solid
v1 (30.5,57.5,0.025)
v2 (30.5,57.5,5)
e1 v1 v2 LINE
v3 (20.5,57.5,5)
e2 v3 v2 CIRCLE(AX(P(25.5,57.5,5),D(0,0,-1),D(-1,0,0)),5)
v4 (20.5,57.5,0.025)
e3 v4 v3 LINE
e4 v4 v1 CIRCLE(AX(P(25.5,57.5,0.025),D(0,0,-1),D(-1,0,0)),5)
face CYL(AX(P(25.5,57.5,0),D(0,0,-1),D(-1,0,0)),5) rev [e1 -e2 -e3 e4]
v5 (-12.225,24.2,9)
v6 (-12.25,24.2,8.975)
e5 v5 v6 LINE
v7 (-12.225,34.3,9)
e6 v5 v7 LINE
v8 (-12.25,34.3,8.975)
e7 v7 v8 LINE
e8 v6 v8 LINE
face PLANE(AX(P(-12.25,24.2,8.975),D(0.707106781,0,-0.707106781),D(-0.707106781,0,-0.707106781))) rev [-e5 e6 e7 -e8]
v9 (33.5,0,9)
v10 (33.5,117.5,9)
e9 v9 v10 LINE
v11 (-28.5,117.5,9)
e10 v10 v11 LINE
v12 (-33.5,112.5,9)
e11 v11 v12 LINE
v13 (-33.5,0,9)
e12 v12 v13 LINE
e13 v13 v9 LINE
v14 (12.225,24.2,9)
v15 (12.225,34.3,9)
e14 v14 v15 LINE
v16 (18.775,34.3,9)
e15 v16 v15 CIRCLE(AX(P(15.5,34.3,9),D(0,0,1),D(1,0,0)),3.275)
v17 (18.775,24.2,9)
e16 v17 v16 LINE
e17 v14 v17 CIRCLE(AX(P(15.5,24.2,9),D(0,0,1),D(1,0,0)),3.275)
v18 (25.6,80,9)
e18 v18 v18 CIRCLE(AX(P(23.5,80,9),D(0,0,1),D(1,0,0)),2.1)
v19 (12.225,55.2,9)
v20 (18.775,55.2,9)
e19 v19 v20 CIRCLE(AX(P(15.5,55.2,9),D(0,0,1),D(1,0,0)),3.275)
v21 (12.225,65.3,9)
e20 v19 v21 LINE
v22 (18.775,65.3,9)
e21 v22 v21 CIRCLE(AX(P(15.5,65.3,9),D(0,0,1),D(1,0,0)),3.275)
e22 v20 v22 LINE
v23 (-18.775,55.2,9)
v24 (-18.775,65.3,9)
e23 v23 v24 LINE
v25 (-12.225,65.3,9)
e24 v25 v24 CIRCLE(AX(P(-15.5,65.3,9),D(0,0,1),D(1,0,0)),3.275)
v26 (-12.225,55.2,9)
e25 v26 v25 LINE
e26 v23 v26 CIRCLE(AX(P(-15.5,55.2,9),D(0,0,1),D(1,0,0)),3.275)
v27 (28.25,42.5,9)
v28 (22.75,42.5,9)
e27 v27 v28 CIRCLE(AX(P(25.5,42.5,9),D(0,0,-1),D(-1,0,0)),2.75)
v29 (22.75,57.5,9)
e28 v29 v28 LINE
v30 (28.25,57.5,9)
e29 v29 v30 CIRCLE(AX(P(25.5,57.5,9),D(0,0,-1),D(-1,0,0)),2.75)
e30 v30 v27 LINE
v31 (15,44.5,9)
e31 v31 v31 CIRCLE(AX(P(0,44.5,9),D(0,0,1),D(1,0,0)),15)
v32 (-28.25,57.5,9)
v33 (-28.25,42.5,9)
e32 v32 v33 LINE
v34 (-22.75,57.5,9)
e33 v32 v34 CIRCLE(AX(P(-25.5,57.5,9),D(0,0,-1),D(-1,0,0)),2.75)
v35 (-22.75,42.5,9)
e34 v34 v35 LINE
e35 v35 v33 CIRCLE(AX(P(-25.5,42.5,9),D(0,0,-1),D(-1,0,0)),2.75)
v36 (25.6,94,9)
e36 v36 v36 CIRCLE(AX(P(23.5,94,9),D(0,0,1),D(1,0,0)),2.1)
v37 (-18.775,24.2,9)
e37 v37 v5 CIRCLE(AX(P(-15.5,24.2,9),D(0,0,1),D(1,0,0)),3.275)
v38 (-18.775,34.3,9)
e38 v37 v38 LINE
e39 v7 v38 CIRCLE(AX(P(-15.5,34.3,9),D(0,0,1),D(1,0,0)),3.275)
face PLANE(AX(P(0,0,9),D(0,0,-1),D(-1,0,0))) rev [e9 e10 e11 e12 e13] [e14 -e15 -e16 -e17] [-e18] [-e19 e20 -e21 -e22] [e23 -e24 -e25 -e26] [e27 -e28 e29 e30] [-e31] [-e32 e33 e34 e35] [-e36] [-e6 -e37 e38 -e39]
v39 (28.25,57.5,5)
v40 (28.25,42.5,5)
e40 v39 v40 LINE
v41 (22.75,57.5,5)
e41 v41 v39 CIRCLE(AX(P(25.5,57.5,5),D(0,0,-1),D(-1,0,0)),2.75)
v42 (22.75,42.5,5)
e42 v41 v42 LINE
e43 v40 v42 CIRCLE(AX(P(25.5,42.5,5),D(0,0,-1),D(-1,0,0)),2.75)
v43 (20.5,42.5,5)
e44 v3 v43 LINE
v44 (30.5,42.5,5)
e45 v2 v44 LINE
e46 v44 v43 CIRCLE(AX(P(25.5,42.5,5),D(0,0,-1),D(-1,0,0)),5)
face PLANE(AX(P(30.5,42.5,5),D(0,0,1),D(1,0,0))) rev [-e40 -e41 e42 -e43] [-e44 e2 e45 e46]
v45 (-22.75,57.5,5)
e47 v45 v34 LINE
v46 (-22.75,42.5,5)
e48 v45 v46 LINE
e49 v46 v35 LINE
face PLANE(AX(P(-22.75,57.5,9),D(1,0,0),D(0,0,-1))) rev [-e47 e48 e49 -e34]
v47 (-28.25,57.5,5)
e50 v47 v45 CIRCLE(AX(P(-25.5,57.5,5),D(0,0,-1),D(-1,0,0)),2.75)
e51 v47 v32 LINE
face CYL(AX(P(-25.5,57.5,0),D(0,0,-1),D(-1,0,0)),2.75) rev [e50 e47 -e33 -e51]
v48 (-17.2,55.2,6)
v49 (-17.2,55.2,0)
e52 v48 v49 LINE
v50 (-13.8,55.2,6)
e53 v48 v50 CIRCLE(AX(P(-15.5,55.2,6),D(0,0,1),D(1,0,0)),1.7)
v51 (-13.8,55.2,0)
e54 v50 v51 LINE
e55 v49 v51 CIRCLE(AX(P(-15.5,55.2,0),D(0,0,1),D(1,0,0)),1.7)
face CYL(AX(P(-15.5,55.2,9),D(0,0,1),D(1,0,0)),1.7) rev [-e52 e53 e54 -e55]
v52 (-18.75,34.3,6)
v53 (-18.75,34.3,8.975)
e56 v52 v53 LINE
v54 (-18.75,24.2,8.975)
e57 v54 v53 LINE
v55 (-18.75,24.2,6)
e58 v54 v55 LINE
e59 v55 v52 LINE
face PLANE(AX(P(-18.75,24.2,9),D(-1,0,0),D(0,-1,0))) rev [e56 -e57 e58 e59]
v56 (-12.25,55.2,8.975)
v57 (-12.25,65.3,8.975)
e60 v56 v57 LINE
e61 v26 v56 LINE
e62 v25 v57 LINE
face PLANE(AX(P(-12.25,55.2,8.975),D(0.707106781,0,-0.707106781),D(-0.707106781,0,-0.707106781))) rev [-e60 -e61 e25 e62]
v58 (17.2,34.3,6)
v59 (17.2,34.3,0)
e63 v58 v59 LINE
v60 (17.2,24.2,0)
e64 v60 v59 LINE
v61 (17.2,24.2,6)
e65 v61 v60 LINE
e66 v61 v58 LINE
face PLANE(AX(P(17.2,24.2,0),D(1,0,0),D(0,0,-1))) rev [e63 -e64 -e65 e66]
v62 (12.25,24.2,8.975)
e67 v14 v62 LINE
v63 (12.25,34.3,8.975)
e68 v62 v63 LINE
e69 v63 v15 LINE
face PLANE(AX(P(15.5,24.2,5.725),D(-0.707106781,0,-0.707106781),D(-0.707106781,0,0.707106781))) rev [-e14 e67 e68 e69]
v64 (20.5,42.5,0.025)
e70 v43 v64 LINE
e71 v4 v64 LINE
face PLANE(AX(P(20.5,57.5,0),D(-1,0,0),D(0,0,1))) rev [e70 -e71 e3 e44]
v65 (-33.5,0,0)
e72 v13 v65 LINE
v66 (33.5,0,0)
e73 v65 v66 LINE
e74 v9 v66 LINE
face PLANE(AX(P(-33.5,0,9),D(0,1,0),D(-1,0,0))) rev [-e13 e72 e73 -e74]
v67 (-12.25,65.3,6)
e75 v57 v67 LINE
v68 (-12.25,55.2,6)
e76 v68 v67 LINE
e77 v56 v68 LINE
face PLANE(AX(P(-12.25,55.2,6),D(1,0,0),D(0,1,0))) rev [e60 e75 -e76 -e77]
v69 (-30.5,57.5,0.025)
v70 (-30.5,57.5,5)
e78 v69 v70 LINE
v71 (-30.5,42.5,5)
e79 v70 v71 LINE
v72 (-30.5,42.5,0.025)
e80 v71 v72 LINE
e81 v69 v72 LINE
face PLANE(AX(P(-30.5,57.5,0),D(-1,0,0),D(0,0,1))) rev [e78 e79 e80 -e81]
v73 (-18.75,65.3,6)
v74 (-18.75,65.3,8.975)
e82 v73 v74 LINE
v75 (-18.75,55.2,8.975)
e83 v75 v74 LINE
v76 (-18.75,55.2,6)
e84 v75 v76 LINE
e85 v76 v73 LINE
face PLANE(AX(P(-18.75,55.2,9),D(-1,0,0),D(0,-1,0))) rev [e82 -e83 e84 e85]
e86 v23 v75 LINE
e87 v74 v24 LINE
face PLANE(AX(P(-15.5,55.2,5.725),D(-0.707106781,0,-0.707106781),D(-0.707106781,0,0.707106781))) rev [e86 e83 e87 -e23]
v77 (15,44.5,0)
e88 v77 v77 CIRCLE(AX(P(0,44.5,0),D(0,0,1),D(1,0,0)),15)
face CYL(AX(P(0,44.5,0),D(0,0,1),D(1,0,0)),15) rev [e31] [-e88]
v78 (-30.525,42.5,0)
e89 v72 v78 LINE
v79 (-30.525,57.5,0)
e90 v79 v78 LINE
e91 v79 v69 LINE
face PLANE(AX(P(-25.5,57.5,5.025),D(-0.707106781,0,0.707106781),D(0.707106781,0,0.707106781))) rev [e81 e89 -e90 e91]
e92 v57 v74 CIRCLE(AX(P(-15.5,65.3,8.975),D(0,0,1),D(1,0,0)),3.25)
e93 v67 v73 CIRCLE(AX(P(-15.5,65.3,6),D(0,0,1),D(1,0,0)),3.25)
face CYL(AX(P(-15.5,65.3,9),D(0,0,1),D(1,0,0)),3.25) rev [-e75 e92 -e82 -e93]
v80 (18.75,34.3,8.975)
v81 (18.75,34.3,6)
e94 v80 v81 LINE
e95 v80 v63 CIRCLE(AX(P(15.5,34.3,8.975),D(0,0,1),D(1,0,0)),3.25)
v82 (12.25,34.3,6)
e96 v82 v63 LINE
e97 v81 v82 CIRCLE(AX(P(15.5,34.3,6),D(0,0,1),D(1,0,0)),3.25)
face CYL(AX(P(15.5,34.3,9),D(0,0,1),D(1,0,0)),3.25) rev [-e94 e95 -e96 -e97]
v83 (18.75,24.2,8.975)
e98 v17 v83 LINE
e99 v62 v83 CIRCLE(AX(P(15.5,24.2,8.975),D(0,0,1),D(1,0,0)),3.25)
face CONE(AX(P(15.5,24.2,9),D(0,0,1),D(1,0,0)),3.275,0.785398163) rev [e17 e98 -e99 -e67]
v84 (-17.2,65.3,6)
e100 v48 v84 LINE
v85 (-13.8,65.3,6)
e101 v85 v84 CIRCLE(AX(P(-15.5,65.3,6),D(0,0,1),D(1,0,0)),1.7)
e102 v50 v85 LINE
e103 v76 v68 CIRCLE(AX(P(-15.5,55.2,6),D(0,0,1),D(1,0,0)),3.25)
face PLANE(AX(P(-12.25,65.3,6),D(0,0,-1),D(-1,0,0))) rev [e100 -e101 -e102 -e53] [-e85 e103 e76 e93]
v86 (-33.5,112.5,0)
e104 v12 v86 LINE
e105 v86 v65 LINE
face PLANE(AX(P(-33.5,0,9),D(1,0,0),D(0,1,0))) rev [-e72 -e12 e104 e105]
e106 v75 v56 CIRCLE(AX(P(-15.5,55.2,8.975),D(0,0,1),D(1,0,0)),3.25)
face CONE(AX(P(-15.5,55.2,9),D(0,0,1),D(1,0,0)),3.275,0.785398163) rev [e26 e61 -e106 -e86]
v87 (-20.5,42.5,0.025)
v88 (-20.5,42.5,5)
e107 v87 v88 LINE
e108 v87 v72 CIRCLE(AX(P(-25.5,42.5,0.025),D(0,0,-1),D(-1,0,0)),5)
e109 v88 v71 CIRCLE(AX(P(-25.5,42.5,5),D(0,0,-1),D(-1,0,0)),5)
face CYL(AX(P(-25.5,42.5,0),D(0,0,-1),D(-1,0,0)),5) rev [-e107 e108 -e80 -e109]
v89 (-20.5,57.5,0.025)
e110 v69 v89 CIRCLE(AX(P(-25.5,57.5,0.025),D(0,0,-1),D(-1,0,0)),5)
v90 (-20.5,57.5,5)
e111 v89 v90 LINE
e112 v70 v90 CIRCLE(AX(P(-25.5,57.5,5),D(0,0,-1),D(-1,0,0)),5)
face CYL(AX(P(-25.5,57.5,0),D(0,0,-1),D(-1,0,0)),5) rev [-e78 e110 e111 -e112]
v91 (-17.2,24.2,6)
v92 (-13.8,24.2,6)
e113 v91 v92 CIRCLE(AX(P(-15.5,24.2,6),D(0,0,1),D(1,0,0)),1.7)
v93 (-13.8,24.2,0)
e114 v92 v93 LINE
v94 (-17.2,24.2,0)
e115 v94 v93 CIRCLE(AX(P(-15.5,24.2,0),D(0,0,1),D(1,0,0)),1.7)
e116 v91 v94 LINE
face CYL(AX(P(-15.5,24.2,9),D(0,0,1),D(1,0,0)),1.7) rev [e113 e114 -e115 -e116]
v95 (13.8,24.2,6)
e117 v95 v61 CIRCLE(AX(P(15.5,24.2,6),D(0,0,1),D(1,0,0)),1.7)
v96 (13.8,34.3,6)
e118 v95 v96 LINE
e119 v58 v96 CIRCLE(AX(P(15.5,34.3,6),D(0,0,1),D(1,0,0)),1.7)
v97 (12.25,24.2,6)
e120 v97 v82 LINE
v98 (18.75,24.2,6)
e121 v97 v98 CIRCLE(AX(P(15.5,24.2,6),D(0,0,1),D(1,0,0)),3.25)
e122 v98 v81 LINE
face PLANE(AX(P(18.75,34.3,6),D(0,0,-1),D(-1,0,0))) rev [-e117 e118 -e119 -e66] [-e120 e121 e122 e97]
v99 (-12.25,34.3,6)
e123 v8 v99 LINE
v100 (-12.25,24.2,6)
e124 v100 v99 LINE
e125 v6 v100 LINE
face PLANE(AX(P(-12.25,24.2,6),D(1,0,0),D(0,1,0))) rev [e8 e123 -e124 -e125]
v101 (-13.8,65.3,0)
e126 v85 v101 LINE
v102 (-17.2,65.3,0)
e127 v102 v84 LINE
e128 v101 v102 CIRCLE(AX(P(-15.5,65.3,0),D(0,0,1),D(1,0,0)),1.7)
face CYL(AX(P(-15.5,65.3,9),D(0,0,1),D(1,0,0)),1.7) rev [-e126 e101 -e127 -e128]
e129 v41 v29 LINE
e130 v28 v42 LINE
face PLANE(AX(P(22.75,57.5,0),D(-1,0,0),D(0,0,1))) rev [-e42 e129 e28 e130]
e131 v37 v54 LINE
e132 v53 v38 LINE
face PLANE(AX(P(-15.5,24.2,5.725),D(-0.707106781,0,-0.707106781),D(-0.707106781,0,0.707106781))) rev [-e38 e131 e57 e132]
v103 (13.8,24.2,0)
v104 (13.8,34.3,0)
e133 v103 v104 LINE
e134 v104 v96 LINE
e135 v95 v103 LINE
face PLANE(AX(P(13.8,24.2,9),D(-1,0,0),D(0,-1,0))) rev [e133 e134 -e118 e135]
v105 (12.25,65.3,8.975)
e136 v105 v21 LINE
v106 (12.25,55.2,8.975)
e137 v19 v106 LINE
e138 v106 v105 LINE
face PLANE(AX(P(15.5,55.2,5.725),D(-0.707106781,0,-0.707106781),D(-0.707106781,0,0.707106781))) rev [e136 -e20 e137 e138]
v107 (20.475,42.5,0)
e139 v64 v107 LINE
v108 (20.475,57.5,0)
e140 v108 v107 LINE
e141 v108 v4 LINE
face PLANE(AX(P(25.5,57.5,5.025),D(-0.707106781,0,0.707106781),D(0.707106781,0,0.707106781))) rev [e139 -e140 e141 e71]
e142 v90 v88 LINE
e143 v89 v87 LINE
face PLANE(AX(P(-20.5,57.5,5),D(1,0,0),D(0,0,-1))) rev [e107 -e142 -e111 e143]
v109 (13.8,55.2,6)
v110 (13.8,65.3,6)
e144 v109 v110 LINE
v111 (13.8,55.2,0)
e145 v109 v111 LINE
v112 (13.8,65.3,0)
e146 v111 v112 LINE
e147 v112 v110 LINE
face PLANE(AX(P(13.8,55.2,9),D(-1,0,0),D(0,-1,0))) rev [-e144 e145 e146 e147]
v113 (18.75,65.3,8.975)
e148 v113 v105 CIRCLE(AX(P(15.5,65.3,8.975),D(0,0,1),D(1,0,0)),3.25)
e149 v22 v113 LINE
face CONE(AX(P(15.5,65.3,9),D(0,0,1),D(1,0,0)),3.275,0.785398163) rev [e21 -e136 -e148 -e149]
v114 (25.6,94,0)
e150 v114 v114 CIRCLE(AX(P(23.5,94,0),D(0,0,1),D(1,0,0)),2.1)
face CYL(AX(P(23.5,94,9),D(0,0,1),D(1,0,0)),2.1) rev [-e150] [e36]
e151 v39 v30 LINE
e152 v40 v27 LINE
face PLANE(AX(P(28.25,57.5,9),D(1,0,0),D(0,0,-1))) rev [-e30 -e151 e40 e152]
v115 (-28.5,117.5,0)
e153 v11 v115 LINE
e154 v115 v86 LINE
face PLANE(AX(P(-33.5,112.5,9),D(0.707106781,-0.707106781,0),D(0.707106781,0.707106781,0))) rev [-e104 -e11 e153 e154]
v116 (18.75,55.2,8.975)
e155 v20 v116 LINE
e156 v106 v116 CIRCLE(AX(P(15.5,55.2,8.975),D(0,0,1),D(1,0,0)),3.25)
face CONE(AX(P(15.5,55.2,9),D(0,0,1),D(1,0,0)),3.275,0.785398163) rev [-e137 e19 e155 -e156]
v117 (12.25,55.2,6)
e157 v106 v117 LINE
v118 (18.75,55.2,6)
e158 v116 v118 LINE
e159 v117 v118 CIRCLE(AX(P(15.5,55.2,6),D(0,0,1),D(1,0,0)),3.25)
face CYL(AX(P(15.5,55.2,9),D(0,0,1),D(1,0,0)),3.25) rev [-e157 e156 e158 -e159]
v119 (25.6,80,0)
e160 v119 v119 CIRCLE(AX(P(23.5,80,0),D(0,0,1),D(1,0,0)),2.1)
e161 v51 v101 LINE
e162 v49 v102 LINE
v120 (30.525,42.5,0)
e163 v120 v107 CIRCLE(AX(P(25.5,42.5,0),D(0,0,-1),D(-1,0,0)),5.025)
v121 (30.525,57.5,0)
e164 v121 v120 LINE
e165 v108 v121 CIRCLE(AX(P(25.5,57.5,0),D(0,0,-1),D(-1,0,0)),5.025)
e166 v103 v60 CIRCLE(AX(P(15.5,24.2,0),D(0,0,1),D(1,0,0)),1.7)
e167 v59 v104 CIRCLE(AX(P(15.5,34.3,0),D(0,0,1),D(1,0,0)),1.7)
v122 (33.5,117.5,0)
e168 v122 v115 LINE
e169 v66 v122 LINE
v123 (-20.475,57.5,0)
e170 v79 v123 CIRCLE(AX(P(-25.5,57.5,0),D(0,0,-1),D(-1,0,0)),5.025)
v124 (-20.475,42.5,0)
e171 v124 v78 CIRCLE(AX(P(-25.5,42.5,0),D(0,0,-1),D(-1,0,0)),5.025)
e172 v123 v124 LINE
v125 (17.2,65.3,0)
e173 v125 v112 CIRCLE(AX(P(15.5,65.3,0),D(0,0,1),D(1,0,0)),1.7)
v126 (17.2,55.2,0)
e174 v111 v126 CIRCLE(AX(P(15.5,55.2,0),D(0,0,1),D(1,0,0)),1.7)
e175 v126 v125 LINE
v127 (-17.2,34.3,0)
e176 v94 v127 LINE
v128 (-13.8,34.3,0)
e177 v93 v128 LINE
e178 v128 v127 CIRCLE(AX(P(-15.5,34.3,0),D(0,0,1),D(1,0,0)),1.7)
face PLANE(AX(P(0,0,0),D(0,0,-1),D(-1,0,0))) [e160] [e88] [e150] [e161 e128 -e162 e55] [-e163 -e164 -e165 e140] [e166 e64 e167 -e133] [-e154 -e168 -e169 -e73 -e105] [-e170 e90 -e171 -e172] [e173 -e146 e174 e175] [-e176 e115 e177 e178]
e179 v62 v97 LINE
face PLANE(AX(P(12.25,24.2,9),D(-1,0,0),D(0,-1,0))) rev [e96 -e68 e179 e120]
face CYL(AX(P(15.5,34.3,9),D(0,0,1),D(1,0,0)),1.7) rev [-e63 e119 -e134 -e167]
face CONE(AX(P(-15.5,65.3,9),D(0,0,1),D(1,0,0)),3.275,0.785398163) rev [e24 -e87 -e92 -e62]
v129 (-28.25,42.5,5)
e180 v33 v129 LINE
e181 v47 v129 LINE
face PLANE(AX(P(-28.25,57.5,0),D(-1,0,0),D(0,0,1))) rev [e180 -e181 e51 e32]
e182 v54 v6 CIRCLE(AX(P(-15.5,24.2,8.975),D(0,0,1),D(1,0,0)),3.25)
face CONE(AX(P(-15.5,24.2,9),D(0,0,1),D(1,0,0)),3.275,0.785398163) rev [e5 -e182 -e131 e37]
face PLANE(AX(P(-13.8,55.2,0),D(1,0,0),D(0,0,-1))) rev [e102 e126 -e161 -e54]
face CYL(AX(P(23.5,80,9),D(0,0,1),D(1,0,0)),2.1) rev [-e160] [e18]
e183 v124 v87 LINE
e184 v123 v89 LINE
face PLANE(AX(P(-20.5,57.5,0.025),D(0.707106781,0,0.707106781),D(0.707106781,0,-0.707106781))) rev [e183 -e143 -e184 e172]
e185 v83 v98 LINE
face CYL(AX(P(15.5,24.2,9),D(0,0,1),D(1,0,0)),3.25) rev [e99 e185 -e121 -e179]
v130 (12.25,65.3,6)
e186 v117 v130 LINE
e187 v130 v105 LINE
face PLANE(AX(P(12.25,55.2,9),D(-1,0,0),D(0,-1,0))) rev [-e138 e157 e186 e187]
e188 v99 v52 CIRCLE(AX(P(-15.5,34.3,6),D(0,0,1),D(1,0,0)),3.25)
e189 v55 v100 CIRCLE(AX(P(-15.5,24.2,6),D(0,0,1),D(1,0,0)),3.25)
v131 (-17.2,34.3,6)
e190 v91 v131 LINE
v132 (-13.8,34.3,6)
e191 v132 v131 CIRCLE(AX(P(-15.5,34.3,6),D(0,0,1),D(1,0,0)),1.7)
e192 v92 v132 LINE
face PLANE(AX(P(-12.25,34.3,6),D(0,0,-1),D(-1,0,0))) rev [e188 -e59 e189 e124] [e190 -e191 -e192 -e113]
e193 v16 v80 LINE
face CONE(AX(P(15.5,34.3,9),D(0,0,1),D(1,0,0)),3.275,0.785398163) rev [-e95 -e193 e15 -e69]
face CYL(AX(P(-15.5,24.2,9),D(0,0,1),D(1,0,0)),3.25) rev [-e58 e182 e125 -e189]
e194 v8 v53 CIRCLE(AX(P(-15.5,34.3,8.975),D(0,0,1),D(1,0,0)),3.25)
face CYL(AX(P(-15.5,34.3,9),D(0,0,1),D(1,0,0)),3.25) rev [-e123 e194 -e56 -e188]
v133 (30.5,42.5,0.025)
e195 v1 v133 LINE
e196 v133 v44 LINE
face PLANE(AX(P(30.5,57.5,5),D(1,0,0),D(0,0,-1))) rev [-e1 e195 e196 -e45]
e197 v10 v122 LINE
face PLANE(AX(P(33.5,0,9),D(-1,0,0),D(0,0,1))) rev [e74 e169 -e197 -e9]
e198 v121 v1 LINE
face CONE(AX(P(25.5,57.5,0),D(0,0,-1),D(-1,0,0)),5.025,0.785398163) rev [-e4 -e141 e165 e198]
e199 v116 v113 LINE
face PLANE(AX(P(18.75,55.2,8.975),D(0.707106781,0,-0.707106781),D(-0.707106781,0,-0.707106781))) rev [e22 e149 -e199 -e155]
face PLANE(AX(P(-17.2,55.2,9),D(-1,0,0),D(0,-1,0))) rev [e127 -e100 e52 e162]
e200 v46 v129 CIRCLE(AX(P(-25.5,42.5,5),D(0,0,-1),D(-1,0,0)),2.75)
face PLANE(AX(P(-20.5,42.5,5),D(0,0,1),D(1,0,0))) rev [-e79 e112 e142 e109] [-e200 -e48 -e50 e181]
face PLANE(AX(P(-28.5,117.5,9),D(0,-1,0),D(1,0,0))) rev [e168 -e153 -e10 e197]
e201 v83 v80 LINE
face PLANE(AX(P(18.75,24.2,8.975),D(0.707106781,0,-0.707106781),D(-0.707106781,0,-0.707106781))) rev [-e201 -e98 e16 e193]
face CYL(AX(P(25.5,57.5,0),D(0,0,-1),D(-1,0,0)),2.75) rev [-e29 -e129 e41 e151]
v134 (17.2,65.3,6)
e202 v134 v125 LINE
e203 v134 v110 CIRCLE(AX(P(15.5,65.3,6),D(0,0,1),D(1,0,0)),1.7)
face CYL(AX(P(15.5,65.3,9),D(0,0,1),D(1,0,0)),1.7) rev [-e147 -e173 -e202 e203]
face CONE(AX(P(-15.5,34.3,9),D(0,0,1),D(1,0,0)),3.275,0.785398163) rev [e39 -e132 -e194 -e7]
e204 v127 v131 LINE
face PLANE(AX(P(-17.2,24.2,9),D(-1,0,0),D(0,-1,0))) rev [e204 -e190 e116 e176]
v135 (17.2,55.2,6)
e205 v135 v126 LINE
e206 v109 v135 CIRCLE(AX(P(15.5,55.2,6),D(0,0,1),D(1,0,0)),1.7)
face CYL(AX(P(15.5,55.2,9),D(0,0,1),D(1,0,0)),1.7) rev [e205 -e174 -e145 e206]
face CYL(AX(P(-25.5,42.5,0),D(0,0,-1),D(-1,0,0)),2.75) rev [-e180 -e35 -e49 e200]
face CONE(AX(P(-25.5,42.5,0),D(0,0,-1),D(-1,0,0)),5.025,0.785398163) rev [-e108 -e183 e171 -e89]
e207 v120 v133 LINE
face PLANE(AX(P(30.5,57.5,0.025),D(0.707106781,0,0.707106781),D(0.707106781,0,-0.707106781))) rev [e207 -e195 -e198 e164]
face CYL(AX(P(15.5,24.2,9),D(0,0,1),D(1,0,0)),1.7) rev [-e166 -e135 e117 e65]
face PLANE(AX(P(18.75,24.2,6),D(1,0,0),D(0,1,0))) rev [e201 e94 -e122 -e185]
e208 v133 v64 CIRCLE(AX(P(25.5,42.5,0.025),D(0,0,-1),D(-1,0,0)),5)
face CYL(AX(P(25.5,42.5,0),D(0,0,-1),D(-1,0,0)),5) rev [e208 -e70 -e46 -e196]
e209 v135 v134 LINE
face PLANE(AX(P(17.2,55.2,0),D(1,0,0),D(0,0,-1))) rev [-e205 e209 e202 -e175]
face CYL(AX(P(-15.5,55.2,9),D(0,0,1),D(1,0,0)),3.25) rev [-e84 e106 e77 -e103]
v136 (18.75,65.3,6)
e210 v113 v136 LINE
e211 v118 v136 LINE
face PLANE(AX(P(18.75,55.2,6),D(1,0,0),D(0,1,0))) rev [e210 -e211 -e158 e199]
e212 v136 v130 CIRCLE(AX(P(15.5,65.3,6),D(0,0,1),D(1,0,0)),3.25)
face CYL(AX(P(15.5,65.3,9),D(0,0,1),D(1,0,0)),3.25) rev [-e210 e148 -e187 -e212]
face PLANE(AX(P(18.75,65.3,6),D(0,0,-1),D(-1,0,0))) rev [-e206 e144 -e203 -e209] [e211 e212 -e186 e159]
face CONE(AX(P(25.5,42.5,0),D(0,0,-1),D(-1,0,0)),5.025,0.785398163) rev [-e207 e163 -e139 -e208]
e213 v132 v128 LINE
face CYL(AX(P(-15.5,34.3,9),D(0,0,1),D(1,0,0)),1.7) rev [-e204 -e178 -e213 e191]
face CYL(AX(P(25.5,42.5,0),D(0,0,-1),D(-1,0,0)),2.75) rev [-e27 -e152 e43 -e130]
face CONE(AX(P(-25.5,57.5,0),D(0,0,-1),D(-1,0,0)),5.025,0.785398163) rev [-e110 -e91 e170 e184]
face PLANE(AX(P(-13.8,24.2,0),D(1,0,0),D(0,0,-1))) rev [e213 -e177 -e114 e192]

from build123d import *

# Parameters (mm, degrees)
BOSS_EXTRUDE1_DEPTH             = 9
SKETCH2_R                       = 15
MOTOR_HOLE_DEPTH                = 123.513264588
CBORE_START                     = -1
CBORE_SLOT_FOR_M3_SHCS1_DEPTH   = 10
CBORE_START_2                   = 6
CBORE_SLOT_FOR_M3_SHCS1_2_DEPTH = 3
LPATTERN2_COUNT                 = 2
LPATTERN2_PITCH                 = 31
LPATTERN2_COUNT_DIR2            = 2
LPATTERN2_PITCH_DIR2            = 31
CBORE_SLOT_FOR_M5_SHCS1_DEPTH   = 5
CBORE_START_3                   = 5
CBORE_SLOT_FOR_M5_SHCS1_2_DEPTH = 4
M5X0_8_TAPPED_HOLE1_D           = 4.2


with BuildPart() as part:
    # Sketch1 → Boss-Extrude1 (new body)
    with BuildSketch(Plane.XY):
        Polygon((-33.5, 0), (33.5, 0), (33.5, 117.5), (-28.5, 117.5), (-33.5, 112.5), align=None)
    extrude(amount=BOSS_EXTRUDE1_DEPTH)

    # Sketch2 → Motor Hole (cut, through all)
    with BuildSketch(Plane.XY.offset(9)):
        with Locations((0, 44.5)):
            Circle(SKETCH2_R)
    extrude(amount=-MOTOR_HOLE_DEPTH, mode=Mode.SUBTRACT)

    # CBORE SLOT for M3 SHCS1: read off the stored shape, not the designer's step
    # CBORE SLOT for M3 SHCS1 outline → CBORE SLOT for M3 SHCS1 (cut)
    with BuildSketch(Plane.XY.offset(CBORE_START)):
        with BuildLine():
            Line((-13.8, 55.2), (-13.8, 65.3))
            ThreePointArc((-13.8, 65.3), (-15.5, 67), (-17.2, 65.3))
            Line((-17.2, 65.3), (-17.2, 55.2))
            ThreePointArc((-17.2, 55.2), (-15.5, 53.5), (-13.8, 55.2))
        make_face()
    cbore_slot_for_m3_shcs1 = extrude(amount=CBORE_SLOT_FOR_M3_SHCS1_DEPTH, mode=Mode.SUBTRACT)

    # CBORE SLOT for M3 SHCS1 2 outline → CBORE SLOT for M3 SHCS1 2 (cut)
    with BuildSketch(Plane.XY.offset(CBORE_START_2)):
        with BuildLine():
            Line((-12.25, 55.2), (-12.25, 65.3))
            ThreePointArc((-12.25, 65.3), (-15.5, 68.55), (-18.75, 65.3))
            Line((-18.75, 65.3), (-18.75, 55.2))
            ThreePointArc((-18.75, 55.2), (-15.5, 51.95), (-12.25, 55.2))
        make_face()
        with BuildLine():
            ThreePointArc((-17.2, 65.3), (-15.5, 67), (-13.8, 65.3))
            Line((-13.8, 65.3), (-13.8, 55.2))
            ThreePointArc((-13.8, 55.2), (-15.5, 53.5), (-17.2, 55.2))
            Line((-17.2, 55.2), (-17.2, 65.3))
        make_face(mode=Mode.SUBTRACT)
    cbore_slot_for_m3_shcs1_2 = extrude(amount=CBORE_SLOT_FOR_M3_SHCS1_2_DEPTH, mode=Mode.SUBTRACT)

    # CBORE SLOT for M3 SHCS1 3: loft between two sections, ruled curve by curve
    cbore_slot_for_m3_shcs1_3_from = [
        Edge.make_three_point_arc((-12.25, 65.3, 8.975), (-13.201902961, 67.598097039, 8.975), (-15.5, 68.55, 8.975)),
        Edge.make_three_point_arc((-15.5, 68.55, 8.975), (-17.798097039, 67.598097039, 8.975), (-18.75, 65.3, 8.975)),
        Edge.make_three_point_arc((-18.75, 55.2, 8.975), (-17.798097039, 52.901902961, 8.975), (-15.5, 51.95, 8.975)),
        Edge.make_three_point_arc((-15.5, 51.95, 8.975), (-13.201902961, 52.901902961, 8.975), (-12.25, 55.2, 8.975)),
        Edge.make_line((-18.75, 65.3, 8.975), (-18.75, 55.2, 8.975)),
        Edge.make_line((-12.25, 65.3, 8.975), (-12.25, 55.2, 8.975)),
    ]
    cbore_slot_for_m3_shcs1_3_to = [
        Edge.make_three_point_arc((-12.225, 65.3, 9), (-13.184225292, 67.615774708, 9), (-15.5, 68.575, 9)),
        Edge.make_three_point_arc((-15.5, 68.575, 9), (-17.815774708, 67.615774708, 9), (-18.775, 65.3, 9)),
        Edge.make_three_point_arc((-18.775, 55.2, 9), (-17.815774708, 52.884225292, 9), (-15.5, 51.925, 9)),
        Edge.make_three_point_arc((-15.5, 51.925, 9), (-13.184225292, 52.884225292, 9), (-12.225, 55.2, 9)),
        Edge.make_line((-18.775, 65.3, 9), (-18.775, 55.2, 9)),
        Edge.make_line((-12.225, 65.3, 9), (-12.225, 55.2, 9)),
    ]
    cbore_slot_for_m3_shcs1_3 = Solid(Shell([*[Face.make_surface_from_curves(cbore_slot_for_m3_shcs1_3_from[k], cbore_slot_for_m3_shcs1_3_to[k]) for k in range(6)], Face(Wire(cbore_slot_for_m3_shcs1_3_from)), Face(Wire(cbore_slot_for_m3_shcs1_3_to))]))
    add(cbore_slot_for_m3_shcs1_3, mode=Mode.SUBTRACT)

    # LPattern2: CBORE SLOT for M3 SHCS1, CBORE SLOT for M3 SHCS1 2, CBORE SLOT for M3 SHCS1 3 2 × 2
    with Locations(*[(i * LPATTERN2_PITCH, -j * LPATTERN2_PITCH_DIR2, 0) for i in range(LPATTERN2_COUNT) for j in range(LPATTERN2_COUNT_DIR2) if (i, j) != (0, 0)]):
        add(cbore_slot_for_m3_shcs1, mode=Mode.SUBTRACT)
        add(cbore_slot_for_m3_shcs1_2, mode=Mode.SUBTRACT)
        add(cbore_slot_for_m3_shcs1_3, mode=Mode.SUBTRACT)

    # CBORE SLOT for M5 SHCS1: read off the stored shape, not the designer's step
    # CBORE SLOT for M5 SHCS1 outline → CBORE SLOT for M5 SHCS1 (cut)
    with BuildSketch(Plane.XY):
        with BuildLine():
            ThreePointArc((20.5, 42.5), (25.5, 37.5), (30.5, 42.5))
            Line((30.5, 42.5), (30.5, 57.5))
            ThreePointArc((30.5, 57.5), (25.5, 62.5), (20.5, 57.5))
            Line((20.5, 57.5), (20.5, 42.5))
        make_face()
    cbore_slot_for_m5_shcs1 = extrude(amount=CBORE_SLOT_FOR_M5_SHCS1_DEPTH, mode=Mode.SUBTRACT)

    # CBORE SLOT for M5 SHCS1 2 outline → CBORE SLOT for M5 SHCS1 2 (cut)
    with BuildSketch(Plane.XY.offset(CBORE_START_3)):
        with BuildLine():
            ThreePointArc((22.75, 42.5), (25.5, 39.75), (28.25, 42.5))
            Line((28.25, 42.5), (28.25, 57.5))
            ThreePointArc((28.25, 57.5), (25.5, 60.25), (22.75, 57.5))
            Line((22.75, 57.5), (22.75, 42.5))
        make_face()
    cbore_slot_for_m5_shcs1_2 = extrude(amount=CBORE_SLOT_FOR_M5_SHCS1_2_DEPTH, mode=Mode.SUBTRACT)

    # CBORE SLOT for M5 SHCS1 3: loft between two sections, ruled curve by curve
    cbore_slot_for_m5_shcs1_3_from = [
        Edge.make_three_point_arc((30.5, 42.5, 0.025), (29.035533906, 38.964466094, 0.025), (25.5, 37.5, 0.025)),
        Edge.make_three_point_arc((25.5, 37.5, 0.025), (21.964466094, 38.964466094, 0.025), (20.5, 42.5, 0.025)),
        Edge.make_three_point_arc((20.5, 57.5, 0.025), (21.964466094, 61.035533906, 0.025), (25.5, 62.5, 0.025)),
        Edge.make_three_point_arc((25.5, 62.5, 0.025), (29.035533906, 61.035533906, 0.025), (30.5, 57.5, 0.025)),
        Edge.make_line((20.5, 42.5, 0.025), (20.5, 57.5, 0.025)),
        Edge.make_line((30.5, 42.5, 0.025), (30.5, 57.5, 0.025)),
    ]
    cbore_slot_for_m5_shcs1_3_to = [
        Edge.make_three_point_arc((30.525, 42.5, 0), (29.053211575, 38.946788425, 0), (25.5, 37.475, 0)),
        Edge.make_three_point_arc((25.5, 37.475, 0), (21.946788425, 38.946788425, 0), (20.475, 42.5, 0)),
        Edge.make_three_point_arc((20.475, 57.5, 0), (21.946788425, 61.053211575, 0), (25.5, 62.525, 0)),
        Edge.make_three_point_arc((25.5, 62.525, 0), (29.053211575, 61.053211575, 0), (30.525, 57.5, 0)),
        Edge.make_line((20.475, 42.5, 0), (20.475, 57.5, 0)),
        Edge.make_line((30.525, 42.5, 0), (30.525, 57.5, 0)),
    ]
    cbore_slot_for_m5_shcs1_3 = Solid(Shell([*[Face.make_surface_from_curves(cbore_slot_for_m5_shcs1_3_from[k], cbore_slot_for_m5_shcs1_3_to[k]) for k in range(6)], Face(Wire(cbore_slot_for_m5_shcs1_3_from)), Face(Wire(cbore_slot_for_m5_shcs1_3_to))]))
    add(cbore_slot_for_m5_shcs1_3, mode=Mode.SUBTRACT)

    # Mirror1: CBORE SLOT for M5 SHCS1, CBORE SLOT for M5 SHCS1 2, CBORE SLOT for M5 SHCS1 3 across plane
    add(cbore_slot_for_m5_shcs1.mirror(Plane(origin=(0, 0, 0), x_dir=(0, 0, 1), z_dir=(1, 0, 0))), mode=Mode.SUBTRACT)
    add(cbore_slot_for_m5_shcs1_2.mirror(Plane(origin=(0, 0, 0), x_dir=(0, 0, 1), z_dir=(1, 0, 0))), mode=Mode.SUBTRACT)
    add(cbore_slot_for_m5_shcs1_3.mirror(Plane(origin=(0, 0, 0), x_dir=(0, 0, 1), z_dir=(1, 0, 0))), mode=Mode.SUBTRACT)

    # M5x0.8 Tapped Hole1 (through all)
    with Locations(Plane.XY.offset(9)):
        with Locations((23.5, 94), (23.5, 80)):
            Hole(M5X0_8_TAPPED_HOLE1_D / 2)


solid = part.part
